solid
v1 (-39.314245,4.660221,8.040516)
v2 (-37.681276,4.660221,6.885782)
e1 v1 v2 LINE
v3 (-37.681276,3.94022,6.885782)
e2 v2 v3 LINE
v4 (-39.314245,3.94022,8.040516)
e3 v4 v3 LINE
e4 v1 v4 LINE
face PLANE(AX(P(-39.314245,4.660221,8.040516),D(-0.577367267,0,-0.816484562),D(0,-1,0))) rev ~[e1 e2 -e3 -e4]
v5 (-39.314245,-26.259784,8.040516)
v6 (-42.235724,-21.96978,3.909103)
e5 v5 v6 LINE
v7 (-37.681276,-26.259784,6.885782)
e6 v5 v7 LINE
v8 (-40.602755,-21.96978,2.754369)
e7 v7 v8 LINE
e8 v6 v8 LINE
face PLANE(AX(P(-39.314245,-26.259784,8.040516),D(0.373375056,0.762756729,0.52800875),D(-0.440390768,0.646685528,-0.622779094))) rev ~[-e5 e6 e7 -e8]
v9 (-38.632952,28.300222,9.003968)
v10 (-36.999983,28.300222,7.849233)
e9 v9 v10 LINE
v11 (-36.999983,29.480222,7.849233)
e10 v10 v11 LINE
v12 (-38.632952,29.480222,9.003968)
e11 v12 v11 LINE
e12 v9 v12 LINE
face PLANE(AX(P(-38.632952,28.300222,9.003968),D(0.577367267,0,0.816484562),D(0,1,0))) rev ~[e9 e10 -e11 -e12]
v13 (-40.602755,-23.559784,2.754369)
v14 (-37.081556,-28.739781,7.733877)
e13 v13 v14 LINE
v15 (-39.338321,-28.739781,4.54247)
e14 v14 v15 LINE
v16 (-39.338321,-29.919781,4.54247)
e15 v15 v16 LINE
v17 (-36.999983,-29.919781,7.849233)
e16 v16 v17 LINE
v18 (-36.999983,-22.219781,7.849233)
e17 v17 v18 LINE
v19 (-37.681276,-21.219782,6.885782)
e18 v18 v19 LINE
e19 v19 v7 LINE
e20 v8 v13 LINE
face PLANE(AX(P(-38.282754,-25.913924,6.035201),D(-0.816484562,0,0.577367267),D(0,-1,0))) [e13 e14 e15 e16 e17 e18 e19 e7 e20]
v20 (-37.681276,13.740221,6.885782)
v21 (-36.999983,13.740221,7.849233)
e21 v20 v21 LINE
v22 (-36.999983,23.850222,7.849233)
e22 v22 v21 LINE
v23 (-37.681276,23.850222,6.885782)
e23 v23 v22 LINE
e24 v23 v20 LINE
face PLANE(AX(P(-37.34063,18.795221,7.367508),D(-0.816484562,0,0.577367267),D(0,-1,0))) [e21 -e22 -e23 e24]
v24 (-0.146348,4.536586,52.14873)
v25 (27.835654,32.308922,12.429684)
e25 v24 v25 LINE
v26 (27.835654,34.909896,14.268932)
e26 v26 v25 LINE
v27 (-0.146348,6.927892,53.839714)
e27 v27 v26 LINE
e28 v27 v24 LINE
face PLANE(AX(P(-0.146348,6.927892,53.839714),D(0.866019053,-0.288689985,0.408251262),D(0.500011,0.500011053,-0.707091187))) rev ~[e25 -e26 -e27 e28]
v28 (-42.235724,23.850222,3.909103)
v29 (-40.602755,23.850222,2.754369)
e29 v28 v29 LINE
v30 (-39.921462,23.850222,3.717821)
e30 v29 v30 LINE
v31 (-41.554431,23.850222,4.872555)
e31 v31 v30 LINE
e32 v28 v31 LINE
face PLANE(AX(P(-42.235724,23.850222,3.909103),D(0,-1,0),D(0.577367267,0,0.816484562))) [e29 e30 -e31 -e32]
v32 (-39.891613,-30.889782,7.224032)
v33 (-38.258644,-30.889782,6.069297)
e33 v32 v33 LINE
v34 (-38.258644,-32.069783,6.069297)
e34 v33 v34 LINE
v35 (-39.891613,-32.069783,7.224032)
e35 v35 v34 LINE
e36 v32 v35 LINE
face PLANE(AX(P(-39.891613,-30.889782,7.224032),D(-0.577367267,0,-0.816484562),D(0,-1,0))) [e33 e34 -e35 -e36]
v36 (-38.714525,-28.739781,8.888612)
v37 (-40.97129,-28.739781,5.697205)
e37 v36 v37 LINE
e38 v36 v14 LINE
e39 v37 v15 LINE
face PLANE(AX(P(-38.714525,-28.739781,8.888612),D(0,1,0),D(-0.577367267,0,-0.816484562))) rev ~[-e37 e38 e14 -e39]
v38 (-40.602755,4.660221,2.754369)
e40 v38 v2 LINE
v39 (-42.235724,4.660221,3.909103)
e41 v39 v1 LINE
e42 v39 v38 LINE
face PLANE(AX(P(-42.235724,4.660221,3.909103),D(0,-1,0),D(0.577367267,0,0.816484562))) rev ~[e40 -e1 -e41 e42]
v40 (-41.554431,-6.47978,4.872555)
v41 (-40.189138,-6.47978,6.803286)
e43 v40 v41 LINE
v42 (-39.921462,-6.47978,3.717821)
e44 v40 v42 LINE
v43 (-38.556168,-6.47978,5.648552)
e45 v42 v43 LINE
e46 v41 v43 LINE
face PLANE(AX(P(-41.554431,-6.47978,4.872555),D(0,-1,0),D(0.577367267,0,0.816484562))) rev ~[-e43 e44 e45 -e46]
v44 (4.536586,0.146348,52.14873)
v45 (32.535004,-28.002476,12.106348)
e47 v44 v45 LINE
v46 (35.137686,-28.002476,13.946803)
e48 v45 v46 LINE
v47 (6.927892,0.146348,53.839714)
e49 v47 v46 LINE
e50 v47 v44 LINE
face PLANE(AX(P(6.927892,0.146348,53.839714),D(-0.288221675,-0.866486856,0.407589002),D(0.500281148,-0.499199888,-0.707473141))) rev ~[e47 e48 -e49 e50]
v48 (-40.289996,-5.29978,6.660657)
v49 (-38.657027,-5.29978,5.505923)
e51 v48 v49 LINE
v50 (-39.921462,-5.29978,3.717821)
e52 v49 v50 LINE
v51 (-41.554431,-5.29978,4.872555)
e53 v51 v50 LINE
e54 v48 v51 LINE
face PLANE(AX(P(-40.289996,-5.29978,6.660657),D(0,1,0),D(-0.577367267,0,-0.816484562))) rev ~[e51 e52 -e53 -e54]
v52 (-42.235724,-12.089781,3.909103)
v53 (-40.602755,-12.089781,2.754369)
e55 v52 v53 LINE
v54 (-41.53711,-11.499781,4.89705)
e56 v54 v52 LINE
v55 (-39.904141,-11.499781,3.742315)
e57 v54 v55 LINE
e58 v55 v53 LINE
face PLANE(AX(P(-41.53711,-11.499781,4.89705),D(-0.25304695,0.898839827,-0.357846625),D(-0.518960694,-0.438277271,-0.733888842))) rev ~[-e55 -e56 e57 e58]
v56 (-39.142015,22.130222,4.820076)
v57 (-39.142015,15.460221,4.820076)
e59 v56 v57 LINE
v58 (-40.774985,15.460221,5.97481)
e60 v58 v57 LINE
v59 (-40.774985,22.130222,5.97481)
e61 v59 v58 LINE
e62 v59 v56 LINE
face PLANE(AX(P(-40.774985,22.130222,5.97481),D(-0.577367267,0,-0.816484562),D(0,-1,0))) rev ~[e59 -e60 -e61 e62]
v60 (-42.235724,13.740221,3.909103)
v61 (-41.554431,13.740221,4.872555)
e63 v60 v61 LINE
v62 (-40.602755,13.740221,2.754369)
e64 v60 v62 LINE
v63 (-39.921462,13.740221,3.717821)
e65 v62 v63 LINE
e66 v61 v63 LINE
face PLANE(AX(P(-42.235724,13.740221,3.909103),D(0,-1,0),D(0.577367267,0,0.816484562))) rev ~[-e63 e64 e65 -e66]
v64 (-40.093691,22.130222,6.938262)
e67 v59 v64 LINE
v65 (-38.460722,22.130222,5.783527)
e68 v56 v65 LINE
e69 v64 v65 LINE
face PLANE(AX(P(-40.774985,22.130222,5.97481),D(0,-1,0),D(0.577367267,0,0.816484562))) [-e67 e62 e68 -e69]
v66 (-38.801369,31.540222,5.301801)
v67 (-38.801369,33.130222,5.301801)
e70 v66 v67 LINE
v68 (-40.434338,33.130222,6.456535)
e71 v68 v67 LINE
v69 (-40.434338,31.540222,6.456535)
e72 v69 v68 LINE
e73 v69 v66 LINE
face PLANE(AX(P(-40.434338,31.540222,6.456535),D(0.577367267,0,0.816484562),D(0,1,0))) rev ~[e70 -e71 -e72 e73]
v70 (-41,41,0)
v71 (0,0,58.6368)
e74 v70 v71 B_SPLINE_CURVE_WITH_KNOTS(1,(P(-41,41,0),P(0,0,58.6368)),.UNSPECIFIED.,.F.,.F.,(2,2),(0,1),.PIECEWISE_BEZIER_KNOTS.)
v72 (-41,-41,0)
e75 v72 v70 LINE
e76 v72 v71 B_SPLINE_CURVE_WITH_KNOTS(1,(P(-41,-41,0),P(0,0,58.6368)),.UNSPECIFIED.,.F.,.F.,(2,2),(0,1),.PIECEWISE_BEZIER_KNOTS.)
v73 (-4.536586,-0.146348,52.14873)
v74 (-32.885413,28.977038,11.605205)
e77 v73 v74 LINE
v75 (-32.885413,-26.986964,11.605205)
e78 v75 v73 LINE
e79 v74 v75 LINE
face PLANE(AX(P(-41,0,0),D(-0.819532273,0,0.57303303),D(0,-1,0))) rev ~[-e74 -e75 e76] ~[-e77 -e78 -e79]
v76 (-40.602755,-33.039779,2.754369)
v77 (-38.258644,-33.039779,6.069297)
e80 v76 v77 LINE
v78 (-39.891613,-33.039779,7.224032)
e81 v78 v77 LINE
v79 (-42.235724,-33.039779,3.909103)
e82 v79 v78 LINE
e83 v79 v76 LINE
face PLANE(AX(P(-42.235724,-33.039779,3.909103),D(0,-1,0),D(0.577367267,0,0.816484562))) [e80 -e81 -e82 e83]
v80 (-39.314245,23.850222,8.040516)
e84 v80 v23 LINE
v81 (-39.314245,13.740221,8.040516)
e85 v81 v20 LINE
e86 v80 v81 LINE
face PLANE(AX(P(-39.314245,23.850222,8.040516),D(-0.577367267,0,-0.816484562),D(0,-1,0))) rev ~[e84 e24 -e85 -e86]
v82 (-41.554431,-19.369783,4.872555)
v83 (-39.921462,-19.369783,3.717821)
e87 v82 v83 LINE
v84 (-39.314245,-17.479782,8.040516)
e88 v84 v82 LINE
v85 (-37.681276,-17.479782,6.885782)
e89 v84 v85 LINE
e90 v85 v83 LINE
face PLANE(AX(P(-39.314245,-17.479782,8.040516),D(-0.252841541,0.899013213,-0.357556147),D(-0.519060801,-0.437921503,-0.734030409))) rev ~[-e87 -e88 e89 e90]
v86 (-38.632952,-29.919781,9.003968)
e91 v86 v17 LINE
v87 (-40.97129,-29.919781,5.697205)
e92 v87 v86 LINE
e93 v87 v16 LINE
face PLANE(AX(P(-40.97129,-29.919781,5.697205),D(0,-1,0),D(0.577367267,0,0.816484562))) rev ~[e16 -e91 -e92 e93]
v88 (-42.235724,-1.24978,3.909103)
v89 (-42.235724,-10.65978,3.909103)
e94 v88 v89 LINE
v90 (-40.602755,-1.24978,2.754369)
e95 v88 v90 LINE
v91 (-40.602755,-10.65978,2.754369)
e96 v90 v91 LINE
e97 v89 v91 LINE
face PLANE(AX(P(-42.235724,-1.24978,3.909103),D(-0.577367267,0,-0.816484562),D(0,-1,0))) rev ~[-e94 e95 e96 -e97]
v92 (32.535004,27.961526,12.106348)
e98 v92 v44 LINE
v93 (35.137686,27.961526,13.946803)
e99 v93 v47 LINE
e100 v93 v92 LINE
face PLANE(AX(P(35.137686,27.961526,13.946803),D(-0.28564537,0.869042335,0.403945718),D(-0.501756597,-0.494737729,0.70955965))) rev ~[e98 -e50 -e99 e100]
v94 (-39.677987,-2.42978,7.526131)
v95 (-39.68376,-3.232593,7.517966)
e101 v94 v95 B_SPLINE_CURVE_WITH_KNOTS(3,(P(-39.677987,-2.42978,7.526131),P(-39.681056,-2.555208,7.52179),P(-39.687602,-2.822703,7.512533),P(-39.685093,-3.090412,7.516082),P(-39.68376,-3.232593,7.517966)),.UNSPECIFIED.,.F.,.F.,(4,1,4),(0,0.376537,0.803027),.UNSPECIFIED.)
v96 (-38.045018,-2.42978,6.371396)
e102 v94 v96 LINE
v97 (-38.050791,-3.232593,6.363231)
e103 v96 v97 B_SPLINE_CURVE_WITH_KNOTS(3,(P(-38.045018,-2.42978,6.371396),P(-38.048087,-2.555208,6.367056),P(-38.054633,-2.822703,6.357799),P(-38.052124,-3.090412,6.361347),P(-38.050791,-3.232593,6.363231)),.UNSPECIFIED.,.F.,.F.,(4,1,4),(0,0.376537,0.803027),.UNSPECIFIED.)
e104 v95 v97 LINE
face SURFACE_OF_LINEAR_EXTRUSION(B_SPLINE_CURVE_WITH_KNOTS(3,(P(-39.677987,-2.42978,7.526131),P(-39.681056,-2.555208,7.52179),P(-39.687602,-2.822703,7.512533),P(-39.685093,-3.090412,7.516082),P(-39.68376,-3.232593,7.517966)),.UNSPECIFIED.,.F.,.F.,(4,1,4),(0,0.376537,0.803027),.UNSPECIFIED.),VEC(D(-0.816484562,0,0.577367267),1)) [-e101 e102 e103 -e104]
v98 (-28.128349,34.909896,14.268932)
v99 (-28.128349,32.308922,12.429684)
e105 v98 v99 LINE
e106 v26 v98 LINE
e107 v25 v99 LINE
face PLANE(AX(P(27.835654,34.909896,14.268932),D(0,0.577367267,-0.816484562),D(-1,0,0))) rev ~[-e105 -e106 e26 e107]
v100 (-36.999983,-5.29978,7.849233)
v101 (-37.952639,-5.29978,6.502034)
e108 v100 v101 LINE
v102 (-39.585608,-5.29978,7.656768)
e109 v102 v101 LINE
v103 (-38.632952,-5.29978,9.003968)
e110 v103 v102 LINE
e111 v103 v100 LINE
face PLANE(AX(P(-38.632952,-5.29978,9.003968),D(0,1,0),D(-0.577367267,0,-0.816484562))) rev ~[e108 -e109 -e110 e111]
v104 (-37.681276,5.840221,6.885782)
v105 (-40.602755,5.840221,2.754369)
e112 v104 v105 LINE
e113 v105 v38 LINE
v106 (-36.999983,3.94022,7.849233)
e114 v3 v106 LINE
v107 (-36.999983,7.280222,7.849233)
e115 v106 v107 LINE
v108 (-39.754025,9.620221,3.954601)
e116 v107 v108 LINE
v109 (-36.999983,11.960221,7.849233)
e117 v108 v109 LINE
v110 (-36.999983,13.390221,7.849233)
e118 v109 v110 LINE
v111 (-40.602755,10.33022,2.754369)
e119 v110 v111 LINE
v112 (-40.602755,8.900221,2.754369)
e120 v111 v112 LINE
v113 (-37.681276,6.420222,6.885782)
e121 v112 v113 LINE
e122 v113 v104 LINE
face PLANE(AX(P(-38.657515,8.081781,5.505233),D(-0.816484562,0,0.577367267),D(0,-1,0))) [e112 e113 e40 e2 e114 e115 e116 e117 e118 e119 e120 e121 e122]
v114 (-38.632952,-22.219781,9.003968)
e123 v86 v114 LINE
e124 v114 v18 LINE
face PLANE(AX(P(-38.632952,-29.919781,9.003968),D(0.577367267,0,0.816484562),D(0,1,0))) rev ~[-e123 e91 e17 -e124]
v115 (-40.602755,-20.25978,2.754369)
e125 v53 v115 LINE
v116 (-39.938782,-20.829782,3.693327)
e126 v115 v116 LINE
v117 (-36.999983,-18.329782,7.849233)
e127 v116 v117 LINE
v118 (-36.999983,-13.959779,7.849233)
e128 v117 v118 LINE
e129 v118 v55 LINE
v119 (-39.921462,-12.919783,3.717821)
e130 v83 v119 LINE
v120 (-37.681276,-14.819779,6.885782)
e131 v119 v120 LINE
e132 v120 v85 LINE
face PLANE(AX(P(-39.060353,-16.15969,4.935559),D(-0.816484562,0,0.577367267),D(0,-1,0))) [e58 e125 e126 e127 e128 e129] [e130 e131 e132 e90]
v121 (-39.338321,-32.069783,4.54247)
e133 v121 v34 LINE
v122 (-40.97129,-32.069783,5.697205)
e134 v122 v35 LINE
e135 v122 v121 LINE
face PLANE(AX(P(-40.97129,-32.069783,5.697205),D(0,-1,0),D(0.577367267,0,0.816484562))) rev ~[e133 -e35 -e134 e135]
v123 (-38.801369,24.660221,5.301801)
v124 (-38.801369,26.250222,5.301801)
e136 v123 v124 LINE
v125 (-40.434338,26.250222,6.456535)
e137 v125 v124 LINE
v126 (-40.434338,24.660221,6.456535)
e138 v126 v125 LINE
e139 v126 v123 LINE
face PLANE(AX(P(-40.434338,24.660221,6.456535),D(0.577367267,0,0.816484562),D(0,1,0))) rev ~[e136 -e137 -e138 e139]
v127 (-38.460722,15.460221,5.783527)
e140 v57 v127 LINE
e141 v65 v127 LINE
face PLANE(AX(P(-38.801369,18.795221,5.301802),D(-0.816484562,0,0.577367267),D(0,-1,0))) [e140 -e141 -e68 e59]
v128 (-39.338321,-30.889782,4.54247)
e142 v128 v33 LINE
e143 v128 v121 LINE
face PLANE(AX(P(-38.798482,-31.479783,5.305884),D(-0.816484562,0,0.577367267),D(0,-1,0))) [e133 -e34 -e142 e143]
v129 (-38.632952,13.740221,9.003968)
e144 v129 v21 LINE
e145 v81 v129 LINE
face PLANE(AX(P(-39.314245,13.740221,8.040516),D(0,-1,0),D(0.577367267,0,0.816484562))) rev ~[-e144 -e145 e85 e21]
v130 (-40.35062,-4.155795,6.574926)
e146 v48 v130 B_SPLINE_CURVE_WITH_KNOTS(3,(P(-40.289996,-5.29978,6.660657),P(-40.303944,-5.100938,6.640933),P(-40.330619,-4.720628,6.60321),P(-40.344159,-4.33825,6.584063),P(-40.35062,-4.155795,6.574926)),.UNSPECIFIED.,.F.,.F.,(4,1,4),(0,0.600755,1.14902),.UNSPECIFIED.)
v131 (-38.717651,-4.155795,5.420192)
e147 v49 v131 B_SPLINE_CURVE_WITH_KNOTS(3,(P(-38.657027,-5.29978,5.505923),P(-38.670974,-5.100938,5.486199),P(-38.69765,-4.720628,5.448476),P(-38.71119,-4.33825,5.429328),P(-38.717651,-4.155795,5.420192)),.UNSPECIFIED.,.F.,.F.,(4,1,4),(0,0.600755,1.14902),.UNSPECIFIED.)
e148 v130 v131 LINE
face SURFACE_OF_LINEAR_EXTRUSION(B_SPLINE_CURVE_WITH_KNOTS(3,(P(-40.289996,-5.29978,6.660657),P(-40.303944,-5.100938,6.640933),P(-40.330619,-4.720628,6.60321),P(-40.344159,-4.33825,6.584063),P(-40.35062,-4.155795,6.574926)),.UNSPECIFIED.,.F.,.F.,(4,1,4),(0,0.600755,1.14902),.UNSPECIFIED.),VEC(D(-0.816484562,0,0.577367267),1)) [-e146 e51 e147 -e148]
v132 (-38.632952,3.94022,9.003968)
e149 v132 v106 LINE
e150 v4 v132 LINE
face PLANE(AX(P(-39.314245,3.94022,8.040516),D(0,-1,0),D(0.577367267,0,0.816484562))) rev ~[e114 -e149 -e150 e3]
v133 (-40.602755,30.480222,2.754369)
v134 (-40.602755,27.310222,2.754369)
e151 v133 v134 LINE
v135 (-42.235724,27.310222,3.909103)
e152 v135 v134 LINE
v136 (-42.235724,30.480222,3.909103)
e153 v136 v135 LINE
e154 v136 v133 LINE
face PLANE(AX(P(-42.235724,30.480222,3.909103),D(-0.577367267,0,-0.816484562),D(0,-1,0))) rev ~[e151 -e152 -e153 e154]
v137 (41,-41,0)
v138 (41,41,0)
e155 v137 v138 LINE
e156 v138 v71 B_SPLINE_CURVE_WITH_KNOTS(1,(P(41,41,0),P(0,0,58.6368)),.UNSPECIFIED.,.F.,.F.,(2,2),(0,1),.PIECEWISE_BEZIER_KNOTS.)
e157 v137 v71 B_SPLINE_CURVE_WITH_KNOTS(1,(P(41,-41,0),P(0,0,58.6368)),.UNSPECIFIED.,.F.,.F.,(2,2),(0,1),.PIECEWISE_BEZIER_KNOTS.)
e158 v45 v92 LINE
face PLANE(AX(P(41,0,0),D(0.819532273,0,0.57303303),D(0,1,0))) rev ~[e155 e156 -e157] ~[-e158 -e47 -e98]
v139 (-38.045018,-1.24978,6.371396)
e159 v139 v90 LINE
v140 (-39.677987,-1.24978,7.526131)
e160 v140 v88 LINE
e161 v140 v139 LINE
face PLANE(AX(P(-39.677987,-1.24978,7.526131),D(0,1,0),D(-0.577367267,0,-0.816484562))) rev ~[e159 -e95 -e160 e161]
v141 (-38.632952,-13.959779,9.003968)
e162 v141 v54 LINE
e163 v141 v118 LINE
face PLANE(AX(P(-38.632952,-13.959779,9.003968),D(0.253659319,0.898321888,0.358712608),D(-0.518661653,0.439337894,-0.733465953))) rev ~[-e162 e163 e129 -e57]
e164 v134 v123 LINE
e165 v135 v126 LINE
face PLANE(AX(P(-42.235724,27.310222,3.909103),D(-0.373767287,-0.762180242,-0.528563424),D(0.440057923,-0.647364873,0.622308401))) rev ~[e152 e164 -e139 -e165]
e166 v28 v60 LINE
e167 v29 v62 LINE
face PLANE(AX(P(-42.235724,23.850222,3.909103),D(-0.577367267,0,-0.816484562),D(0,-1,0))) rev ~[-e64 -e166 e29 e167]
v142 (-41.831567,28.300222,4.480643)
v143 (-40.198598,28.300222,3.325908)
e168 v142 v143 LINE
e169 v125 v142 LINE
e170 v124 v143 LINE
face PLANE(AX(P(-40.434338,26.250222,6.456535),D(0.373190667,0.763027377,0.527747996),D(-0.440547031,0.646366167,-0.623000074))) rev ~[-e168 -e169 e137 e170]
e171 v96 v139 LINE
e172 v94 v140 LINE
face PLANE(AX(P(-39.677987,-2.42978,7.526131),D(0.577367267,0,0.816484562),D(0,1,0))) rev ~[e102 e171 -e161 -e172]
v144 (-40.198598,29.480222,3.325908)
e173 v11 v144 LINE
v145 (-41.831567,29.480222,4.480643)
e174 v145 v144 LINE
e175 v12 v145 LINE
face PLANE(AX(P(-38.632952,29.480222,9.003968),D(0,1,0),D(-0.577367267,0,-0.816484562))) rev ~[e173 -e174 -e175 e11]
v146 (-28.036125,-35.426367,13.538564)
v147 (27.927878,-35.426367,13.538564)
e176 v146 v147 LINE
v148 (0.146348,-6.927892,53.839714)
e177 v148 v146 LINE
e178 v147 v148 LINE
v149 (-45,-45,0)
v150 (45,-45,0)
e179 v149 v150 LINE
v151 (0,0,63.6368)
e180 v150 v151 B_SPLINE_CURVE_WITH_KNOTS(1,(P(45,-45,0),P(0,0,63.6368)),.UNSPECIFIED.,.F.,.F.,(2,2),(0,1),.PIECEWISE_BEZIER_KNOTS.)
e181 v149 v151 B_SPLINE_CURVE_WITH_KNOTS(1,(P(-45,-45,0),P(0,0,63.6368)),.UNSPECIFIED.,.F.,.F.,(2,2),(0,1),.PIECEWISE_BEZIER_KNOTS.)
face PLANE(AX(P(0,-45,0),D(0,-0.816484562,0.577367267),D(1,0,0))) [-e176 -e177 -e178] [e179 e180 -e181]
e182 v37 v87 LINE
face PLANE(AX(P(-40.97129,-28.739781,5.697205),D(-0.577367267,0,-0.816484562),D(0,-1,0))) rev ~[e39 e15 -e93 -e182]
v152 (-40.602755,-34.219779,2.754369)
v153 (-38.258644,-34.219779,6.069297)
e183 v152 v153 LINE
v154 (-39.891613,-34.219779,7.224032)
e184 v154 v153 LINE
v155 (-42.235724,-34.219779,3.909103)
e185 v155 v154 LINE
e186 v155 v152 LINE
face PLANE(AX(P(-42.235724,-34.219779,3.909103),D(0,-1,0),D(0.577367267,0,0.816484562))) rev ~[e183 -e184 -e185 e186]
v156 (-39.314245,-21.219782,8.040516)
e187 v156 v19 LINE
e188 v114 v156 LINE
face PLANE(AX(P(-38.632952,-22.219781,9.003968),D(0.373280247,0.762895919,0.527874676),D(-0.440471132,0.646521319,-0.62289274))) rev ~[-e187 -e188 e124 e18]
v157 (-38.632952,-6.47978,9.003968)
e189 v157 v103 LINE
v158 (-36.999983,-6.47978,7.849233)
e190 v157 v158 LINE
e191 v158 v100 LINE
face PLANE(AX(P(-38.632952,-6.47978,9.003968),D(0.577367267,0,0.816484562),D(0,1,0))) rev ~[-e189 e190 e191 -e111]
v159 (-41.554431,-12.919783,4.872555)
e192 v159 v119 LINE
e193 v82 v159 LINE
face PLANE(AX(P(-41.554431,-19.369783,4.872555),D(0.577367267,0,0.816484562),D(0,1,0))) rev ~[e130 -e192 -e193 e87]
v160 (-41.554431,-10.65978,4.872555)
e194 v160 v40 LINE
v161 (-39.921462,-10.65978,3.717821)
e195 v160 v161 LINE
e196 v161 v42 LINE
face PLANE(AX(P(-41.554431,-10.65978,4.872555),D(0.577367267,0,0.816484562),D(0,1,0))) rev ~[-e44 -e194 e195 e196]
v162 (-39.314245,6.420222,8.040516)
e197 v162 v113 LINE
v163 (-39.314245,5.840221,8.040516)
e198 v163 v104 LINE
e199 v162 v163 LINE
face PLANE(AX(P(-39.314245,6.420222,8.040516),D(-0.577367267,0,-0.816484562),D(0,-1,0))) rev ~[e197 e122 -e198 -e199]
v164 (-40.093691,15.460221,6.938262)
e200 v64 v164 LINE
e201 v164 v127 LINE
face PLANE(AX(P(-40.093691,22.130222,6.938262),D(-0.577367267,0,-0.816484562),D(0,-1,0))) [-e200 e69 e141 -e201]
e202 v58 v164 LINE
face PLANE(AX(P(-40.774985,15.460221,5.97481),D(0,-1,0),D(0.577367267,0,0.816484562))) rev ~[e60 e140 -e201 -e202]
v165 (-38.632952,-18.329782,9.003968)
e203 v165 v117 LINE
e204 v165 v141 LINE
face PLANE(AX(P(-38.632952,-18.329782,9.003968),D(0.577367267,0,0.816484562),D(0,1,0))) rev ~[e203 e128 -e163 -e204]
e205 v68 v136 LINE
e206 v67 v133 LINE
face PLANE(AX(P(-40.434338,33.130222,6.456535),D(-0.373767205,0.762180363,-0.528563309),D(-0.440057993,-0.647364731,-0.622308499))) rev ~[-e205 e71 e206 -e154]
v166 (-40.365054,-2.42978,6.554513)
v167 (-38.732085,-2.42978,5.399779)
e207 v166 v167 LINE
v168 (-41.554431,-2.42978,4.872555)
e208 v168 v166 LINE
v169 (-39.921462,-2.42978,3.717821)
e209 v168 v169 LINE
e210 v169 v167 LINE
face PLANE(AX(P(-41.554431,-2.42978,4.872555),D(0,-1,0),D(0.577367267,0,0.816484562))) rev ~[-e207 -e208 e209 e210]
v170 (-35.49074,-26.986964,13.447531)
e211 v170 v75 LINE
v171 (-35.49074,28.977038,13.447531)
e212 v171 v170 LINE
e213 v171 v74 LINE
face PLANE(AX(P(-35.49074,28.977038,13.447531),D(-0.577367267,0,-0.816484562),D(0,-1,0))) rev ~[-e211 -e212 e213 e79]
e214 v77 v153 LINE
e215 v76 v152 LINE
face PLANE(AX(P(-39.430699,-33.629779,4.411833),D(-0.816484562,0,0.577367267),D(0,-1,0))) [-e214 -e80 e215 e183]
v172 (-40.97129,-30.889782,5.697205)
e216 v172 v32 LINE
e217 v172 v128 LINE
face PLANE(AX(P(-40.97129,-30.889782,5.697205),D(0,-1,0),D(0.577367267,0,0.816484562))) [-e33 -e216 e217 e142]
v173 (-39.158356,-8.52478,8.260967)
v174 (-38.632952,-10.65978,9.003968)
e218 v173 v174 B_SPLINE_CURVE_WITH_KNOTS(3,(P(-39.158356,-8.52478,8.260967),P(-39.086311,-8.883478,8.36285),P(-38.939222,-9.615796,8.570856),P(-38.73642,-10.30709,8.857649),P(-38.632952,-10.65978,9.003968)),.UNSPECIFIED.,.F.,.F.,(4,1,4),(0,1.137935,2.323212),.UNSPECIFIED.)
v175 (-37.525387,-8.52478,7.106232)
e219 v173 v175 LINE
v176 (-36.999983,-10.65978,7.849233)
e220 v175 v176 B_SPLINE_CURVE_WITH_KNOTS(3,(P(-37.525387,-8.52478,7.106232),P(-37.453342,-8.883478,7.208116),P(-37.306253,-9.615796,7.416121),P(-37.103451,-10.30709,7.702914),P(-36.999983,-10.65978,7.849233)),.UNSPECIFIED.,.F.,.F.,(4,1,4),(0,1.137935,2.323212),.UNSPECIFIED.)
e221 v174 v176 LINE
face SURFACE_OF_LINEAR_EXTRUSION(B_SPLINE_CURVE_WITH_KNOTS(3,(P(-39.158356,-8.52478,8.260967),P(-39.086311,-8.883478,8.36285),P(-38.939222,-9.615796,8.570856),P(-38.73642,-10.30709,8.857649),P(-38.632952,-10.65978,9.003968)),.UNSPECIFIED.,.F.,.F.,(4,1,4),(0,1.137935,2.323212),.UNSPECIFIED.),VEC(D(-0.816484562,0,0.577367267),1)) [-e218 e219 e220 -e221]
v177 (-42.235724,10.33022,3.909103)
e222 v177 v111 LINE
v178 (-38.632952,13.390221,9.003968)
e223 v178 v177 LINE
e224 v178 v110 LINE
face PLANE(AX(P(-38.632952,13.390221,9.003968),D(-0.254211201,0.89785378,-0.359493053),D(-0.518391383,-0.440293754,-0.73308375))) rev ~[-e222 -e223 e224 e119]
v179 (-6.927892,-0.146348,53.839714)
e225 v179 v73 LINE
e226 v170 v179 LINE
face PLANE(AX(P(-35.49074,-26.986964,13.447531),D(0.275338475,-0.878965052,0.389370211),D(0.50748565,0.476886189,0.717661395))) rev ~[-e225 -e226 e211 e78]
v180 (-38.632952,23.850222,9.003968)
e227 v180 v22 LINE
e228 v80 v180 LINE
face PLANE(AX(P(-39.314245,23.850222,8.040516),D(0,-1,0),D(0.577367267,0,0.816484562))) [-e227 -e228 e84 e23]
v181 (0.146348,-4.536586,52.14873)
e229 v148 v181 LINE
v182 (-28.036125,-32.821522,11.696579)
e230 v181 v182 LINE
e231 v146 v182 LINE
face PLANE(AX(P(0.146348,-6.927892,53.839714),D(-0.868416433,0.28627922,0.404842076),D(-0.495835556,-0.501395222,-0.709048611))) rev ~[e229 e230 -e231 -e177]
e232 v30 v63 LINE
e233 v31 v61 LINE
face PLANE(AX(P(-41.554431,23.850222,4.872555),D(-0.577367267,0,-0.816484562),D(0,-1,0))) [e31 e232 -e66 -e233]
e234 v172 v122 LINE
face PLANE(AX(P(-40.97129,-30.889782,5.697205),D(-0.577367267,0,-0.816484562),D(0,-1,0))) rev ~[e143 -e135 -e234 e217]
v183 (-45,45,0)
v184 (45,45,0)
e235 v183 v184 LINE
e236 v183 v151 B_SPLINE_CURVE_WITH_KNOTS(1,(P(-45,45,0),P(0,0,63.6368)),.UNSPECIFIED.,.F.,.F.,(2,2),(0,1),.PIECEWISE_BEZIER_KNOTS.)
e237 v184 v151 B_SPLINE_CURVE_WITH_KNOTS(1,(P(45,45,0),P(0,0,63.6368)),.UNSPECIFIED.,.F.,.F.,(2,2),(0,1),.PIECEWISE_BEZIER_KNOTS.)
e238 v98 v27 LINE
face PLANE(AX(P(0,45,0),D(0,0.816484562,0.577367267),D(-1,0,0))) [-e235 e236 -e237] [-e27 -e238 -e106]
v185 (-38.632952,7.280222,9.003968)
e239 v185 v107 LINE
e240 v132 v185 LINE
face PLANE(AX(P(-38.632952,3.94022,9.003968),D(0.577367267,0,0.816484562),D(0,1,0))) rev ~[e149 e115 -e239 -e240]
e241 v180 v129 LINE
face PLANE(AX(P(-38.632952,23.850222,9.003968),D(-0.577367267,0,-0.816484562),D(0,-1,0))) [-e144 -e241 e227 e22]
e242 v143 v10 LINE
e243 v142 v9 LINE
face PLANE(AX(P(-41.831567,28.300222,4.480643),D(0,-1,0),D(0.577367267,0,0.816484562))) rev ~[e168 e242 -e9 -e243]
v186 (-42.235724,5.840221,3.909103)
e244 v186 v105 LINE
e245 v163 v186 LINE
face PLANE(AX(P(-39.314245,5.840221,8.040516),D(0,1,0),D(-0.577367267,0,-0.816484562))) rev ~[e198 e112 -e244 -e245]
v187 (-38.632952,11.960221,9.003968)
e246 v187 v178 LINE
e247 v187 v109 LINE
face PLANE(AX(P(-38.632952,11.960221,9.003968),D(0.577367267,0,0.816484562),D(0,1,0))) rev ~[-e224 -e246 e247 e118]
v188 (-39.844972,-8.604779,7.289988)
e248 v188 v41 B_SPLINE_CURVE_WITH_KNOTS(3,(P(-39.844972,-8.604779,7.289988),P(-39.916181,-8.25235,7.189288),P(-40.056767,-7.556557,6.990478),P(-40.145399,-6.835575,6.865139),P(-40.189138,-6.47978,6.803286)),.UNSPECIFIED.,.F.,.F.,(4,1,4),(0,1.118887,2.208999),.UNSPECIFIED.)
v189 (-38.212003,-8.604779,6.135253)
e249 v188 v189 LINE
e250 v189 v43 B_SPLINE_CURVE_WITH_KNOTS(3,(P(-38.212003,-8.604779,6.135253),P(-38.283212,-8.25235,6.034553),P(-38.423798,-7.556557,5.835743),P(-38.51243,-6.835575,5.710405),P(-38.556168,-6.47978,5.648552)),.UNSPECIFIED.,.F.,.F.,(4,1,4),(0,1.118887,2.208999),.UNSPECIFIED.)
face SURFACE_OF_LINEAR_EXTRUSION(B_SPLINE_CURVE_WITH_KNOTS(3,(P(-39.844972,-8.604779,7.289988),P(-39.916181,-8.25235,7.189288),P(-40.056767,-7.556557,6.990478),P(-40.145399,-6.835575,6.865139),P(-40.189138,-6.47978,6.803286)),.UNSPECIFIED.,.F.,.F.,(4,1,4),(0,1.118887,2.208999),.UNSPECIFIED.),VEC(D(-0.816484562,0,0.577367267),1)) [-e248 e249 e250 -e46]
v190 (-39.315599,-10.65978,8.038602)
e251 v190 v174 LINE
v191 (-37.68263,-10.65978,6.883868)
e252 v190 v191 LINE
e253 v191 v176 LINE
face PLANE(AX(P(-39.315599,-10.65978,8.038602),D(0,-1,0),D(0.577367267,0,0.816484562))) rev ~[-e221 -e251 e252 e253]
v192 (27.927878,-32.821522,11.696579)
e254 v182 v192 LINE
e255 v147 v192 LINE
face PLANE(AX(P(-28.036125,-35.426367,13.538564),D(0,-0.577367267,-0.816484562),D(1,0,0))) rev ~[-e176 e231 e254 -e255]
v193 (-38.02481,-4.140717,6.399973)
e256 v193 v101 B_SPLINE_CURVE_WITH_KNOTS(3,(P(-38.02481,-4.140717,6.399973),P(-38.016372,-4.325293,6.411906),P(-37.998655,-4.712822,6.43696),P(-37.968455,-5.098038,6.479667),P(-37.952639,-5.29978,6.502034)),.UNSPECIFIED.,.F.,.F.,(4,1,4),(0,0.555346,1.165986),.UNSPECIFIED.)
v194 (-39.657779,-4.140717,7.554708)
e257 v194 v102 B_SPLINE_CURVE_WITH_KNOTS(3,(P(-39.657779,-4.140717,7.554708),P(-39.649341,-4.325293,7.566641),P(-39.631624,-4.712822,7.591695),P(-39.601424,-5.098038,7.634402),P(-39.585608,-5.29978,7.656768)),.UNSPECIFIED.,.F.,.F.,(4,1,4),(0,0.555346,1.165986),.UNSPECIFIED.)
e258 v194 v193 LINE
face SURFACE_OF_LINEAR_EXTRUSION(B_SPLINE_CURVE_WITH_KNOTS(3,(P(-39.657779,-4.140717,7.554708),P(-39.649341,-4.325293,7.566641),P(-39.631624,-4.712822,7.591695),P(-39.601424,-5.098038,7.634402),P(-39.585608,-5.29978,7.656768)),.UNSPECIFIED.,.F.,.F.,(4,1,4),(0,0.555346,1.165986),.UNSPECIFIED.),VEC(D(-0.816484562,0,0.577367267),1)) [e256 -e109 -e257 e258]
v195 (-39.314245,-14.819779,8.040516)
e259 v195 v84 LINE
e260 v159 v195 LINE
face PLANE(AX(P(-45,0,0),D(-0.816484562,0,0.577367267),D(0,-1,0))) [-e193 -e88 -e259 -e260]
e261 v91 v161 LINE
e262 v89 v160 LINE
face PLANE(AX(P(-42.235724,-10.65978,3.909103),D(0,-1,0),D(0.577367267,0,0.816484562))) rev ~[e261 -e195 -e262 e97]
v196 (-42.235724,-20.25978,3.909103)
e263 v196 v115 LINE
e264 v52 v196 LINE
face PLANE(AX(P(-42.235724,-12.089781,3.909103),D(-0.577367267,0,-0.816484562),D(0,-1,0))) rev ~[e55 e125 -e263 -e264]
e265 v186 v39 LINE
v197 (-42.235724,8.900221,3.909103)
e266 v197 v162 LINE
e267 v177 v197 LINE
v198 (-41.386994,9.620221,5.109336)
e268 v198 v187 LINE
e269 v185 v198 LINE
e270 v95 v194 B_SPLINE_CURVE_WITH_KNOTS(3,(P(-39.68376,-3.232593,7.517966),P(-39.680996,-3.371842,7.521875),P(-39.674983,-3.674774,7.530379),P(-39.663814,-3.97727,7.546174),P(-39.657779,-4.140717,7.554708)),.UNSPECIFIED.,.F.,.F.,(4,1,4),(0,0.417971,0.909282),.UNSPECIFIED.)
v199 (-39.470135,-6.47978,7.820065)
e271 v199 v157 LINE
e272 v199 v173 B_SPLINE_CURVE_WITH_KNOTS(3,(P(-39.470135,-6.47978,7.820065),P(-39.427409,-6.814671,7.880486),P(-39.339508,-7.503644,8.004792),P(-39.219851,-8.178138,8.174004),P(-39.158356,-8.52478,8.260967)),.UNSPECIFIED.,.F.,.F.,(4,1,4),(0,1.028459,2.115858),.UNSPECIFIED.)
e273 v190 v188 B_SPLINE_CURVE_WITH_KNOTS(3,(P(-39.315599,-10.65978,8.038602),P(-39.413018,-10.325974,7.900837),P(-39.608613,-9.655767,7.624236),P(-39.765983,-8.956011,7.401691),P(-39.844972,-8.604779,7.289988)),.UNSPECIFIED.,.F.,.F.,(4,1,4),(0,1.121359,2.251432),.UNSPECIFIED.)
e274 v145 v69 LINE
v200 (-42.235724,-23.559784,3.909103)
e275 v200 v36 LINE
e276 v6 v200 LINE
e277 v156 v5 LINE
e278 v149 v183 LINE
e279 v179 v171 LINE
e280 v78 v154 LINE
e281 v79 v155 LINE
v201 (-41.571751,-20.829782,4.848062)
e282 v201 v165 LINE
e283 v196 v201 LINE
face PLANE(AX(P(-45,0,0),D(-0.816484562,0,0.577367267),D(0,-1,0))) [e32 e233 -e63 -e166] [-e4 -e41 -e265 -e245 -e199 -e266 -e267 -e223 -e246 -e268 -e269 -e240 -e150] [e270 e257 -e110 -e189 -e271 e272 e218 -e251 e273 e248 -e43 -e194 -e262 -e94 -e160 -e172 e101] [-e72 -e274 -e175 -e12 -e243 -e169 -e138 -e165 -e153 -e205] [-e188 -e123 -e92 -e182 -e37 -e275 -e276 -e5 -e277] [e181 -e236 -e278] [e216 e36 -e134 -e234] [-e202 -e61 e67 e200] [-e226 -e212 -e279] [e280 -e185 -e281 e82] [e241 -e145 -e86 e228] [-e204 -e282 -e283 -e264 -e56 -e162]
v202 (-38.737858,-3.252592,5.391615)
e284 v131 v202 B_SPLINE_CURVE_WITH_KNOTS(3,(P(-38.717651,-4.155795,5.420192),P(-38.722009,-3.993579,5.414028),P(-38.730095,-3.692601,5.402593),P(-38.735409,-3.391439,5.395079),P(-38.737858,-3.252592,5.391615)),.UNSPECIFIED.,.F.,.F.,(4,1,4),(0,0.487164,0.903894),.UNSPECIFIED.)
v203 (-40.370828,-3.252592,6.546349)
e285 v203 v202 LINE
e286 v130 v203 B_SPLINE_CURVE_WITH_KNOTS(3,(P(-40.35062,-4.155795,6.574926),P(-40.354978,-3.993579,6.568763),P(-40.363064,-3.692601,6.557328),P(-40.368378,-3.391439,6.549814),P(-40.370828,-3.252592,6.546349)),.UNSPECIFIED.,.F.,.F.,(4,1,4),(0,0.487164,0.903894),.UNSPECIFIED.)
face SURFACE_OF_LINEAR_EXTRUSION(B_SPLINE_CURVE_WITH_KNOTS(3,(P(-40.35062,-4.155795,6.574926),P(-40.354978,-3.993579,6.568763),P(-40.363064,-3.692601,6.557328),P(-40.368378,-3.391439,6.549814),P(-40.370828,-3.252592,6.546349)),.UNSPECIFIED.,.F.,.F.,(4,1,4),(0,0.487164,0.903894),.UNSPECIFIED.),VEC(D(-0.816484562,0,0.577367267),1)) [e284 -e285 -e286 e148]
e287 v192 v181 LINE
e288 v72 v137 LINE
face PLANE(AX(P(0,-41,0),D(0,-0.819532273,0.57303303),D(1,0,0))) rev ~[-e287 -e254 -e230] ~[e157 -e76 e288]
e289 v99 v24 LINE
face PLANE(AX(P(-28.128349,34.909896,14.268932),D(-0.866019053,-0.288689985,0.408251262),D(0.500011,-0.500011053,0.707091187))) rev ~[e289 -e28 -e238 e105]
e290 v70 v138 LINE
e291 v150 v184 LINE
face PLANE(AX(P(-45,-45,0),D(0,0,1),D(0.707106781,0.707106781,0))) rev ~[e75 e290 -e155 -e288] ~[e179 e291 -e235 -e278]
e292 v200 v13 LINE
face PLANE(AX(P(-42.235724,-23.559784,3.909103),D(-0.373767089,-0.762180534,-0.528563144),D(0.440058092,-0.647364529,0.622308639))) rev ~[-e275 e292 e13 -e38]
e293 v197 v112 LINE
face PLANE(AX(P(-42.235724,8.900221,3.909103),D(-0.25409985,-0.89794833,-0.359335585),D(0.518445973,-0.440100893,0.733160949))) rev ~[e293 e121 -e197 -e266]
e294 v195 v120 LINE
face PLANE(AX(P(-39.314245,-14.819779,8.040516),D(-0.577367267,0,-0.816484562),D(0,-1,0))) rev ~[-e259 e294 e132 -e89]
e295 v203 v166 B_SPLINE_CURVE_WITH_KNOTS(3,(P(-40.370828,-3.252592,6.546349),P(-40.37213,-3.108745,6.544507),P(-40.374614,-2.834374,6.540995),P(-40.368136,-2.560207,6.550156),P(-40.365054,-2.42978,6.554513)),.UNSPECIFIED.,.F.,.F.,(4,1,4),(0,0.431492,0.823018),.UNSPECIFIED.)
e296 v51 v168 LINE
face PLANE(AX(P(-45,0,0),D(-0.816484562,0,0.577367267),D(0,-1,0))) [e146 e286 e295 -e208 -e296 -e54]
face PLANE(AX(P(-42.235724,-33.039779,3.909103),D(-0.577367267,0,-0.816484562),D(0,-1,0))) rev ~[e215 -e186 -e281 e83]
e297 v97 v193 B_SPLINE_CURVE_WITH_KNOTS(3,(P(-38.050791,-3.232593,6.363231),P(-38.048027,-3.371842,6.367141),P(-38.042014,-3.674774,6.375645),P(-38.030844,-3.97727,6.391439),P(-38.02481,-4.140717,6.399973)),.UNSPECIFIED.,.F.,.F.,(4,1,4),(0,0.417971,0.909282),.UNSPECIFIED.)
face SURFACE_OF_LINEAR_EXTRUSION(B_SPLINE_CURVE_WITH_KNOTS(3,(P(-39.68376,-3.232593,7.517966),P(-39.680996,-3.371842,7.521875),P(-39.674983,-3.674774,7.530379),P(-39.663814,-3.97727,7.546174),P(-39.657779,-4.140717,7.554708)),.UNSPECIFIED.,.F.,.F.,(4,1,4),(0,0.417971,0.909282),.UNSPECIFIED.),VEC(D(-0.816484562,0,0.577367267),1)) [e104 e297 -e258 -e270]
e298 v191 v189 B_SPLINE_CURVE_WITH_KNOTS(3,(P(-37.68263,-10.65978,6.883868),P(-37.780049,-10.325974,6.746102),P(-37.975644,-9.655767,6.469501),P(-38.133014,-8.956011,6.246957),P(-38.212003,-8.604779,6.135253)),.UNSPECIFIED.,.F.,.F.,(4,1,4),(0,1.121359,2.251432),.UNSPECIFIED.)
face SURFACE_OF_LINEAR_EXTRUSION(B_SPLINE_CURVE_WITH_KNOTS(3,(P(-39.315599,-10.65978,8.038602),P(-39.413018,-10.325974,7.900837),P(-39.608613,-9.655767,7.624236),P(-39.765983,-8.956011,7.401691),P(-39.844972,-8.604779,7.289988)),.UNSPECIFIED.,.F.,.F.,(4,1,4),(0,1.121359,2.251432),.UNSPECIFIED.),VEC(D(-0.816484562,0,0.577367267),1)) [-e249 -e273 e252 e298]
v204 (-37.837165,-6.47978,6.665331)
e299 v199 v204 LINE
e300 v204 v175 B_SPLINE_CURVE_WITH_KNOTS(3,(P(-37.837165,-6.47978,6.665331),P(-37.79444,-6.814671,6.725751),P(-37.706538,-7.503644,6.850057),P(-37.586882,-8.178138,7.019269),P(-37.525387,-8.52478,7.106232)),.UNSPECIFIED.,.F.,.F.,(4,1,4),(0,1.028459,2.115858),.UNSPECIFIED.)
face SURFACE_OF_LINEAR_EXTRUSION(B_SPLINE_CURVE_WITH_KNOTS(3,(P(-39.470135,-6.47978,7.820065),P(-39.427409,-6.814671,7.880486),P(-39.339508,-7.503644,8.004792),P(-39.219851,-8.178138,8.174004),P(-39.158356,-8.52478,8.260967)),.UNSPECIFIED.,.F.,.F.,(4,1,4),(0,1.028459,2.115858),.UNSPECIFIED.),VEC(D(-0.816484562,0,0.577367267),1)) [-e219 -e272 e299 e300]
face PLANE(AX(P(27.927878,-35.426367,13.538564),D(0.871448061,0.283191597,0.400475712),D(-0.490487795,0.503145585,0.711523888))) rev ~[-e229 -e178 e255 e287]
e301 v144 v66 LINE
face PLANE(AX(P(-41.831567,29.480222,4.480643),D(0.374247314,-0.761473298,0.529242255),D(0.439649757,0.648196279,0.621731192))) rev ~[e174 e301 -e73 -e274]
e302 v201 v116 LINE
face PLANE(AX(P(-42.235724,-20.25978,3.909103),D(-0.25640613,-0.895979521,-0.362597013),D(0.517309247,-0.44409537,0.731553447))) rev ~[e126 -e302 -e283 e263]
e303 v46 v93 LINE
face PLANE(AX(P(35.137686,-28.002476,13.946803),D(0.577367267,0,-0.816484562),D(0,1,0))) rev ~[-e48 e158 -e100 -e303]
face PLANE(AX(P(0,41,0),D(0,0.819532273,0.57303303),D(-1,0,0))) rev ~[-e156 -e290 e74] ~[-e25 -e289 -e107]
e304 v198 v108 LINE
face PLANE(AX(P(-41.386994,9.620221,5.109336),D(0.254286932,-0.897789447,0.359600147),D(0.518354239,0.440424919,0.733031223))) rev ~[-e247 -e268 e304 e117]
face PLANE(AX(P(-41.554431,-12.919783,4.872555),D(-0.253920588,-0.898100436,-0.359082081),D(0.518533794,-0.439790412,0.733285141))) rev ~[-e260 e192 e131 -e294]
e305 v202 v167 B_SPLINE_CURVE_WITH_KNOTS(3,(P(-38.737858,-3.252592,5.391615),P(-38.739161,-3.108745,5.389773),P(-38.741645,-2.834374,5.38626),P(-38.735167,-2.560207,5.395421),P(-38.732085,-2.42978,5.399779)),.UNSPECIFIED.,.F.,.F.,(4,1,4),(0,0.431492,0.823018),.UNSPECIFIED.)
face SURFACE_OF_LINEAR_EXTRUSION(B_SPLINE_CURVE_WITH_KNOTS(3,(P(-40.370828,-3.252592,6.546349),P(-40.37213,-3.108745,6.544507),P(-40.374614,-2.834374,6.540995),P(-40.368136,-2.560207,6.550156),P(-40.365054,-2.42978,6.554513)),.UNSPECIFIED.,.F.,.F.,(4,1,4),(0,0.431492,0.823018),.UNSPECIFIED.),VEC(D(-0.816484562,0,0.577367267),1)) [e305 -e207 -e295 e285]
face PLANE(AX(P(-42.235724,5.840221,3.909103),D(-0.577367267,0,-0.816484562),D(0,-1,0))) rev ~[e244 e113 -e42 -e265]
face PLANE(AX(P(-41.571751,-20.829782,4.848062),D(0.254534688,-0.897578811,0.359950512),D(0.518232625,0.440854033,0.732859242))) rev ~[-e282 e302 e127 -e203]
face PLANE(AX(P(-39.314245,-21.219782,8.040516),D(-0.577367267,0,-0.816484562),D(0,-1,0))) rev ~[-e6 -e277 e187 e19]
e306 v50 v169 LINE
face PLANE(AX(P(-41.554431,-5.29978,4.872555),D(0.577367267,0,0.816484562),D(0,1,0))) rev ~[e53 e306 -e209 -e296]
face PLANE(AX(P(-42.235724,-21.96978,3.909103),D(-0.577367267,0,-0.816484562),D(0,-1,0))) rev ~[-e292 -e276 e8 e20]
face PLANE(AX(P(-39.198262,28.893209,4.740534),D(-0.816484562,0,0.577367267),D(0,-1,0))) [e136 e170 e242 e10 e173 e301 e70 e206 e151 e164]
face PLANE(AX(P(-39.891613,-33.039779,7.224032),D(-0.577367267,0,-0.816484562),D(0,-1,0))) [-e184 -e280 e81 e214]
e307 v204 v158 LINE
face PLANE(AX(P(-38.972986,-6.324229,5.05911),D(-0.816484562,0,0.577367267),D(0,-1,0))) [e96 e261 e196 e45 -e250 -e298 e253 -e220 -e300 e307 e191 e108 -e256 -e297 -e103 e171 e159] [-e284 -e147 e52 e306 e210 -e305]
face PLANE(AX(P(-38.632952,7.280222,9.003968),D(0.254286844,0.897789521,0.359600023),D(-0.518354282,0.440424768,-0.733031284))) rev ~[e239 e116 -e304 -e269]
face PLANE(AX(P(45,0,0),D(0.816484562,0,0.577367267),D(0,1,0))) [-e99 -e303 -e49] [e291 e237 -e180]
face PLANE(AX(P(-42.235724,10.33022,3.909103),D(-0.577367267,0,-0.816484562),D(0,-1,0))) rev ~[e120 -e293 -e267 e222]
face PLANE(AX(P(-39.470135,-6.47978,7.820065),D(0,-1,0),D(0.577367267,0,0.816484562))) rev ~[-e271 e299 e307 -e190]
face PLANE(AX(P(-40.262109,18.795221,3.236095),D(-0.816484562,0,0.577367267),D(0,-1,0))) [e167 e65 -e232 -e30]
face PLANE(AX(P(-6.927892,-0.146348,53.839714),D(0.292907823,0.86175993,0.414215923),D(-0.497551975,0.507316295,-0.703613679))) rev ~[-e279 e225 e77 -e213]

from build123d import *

# Parameters (mm, degrees)
F2_W      = 90
F2_H      = 90
F6_W      = 82
F6_H      = 82
F12_DEPTH = 5
F13_DEPTH = 10.1
F14_DEPTH = 10
F15_DEPTH = 10
F16_W     = 1.180001
F16_H     = 1.870001
F16_W_2   = 1.18
F16_H_2   = 4.060001
F16_W_3   = 10.110001
F16_H_3   = 1.18
F16_W_4   = 6.670001
F17_DEPTH = 2


# Not quite as in the source:
# - the dataset's text gives a spline's control points without its knots; the knots are read off the source's solid


with BuildPart() as f3:
    # F2 (on Top) → F3 section 0
    with BuildSketch(Plane.XY, mode=Mode.PRIVATE) as f3_s0:
        Rectangle(F2_W, F2_H)
    loft([f3_s0.sketch, Vertex(0, 0, 63.6368)])

    # F6 (on face) → F7 section 0
    with BuildSketch(Plane.XY, mode=Mode.PRIVATE) as f7_s0:
        Rectangle(F6_W, F6_H)
    loft([f7_s0.sketch, Vertex(0, 0, 58.6368)], mode=Mode.SUBTRACT)

    # F8 (on face) → F12 (cut, symmetric)
    with BuildSketch(Plane(origin=(29.9991167733, 0, 21.2135156827), x_dir=(0, 1, 0), z_dir=(0.8164845616, 0, 0.5773672666))):
        Polygon((0.1463476627, 39.9593571873), (-28.0024763197, -8.9000007138), (27.9615262598, -8.9000007138), align=None)
    extrude(amount=F12_DEPTH, both=True, mode=Mode.SUBTRACT)

    # F9 (on face) → F13 (cut)
    with BuildSketch(Plane(origin=(0, 29.9991167733, 21.2135156827), x_dir=(-1, 0, 0), z_dir=(0, 0.8164845616, 0.5773672666))):
        Polygon((0.1463476627, 39.9593571873), (-27.835653627, -8.5054690465), (28.1283489525, -8.5054690465), align=None)
    extrude(amount=-F13_DEPTH, mode=Mode.SUBTRACT)

    # F10 (on face) → F14 (cut)
    with BuildSketch(Plane(origin=(-29.9991167733, 0, 21.2135156827), x_dir=(0, -1, 0), z_dir=(-0.8164845616, 0, 0.5773672666))):
        Polygon((0.1463476627, 39.9593571873), (-28.9770383388, -9.5114903525), (26.9869642407, -9.5114903525), align=None)
    extrude(amount=-F14_DEPTH, mode=Mode.SUBTRACT)

    # F11 (on face) → F15 (cut)
    with BuildSketch(Plane(origin=(0, -29.9991167733, 21.2135156827), x_dir=(1, 0, 0), z_dir=(0, -0.8164845616, 0.5773672666))):
        Polygon((0.1463476627, 39.9593571873), (-28.0361250043, -9.3999961391), (27.9278775752, -9.3999961391), align=None)
    extrude(amount=-F15_DEPTH, mode=Mode.SUBTRACT)

    # F16 (on face) → F17 (cut)
    with BuildSketch(Plane(origin=(-29.9991167733, 0, 21.2135156827), x_dir=(0, -1, 0), z_dir=(-0.8164845616, 0, 0.5773672666))):
        Polygon((21.9697801374, -21.1938021154), (23.5597841374, -21.1938021154), (28.7397811374, -15.0950853876), (28.7397811374, -19.0038021154), (29.9197811374, -19.0038021154), (29.9197811374, -14.9538011154), (28.8597821374, -14.9538011154), (28.7397811374, -14.9538011154), (22.2197811374, -14.9538011154), (21.2197821374, -16.1338011154), (26.2597841374, -16.1338011154), align=None)
        with Locations((31.4797826374, -18.0688016154)):
            Rectangle(F16_W, F16_H)
        with Locations((33.6297791374, -19.1638016154)):
            Rectangle(F16_W_2, F16_H_2)
        Polygon((12.0897811374, -21.1938021154), (20.2597801374, -21.1938021154), (20.8297821374, -20.0438011154), (18.3297821374, -14.9538011154), (13.9597791374, -14.9538011154), (11.4997811374, -19.9838021154), align=None)
        Polygon((19.3697831374, -20.0138021154), (12.9197831374, -20.0138021154), (14.8197791374, -16.1338011154), (17.4797821374, -16.1338011154), align=None, mode=Mode.SUBTRACT)
        with BuildLine():
            Line((5.2997801374, -14.9538011154), (5.2997801374, -16.6038011154))
            add(Edge.make_bspline(
                [(4.1407171374, -16.7288011154), (4.3252931374, -16.7141861154), (4.7128221374, -16.6835011154), (5.0980381374, -16.6311951154), (5.2997801374, -16.6038011154)],
                knots=[0, 0, 0, 0, 0.555346, 1.165986, 1.165986, 1.165986, 1.165986], degree=3))
            add(Edge.make_bspline(
                [(3.2325931374, -16.7738011154), (3.3718421374, -16.7690131154), (3.6747741374, -16.7585981154), (3.9772701374, -16.7392531154), (4.1407171374, -16.7288011154)],
                knots=[0, 0, 0, 0, 0.417971, 0.909282, 0.909282, 0.909282, 0.909282], degree=3))
            add(Edge.make_bspline(
                [(2.4297801374, -16.7638011154), (2.5552081374, -16.7691171154), (2.8227031374, -16.7804551154), (3.0904121374, -16.7761091154), (3.2325931374, -16.7738011154)],
                knots=[0, 0, 0, 0, 0.376537, 0.803027, 0.803027, 0.803027, 0.803027], degree=3))
            Line((2.4297801374, -16.7638011154), (1.2497801374, -16.7638011154))
            Line((1.2497801374, -16.7638011154), (1.2497801374, -21.1938021154))
            Line((1.2497801374, -21.1938021154), (10.6597801374, -21.1938021154))
            Line((10.6597801374, -21.1938021154), (10.6597801374, -20.0138021154))
            Line((10.6597801374, -20.0138021154), (6.4797801374, -20.0138021154))
            Line((6.4797801374, -20.0138021154), (6.4797801374, -17.6491141154))
            add(Edge.make_bspline(
                [(8.6047791374, -17.0530201154), (8.2523501374, -17.1763541154), (7.5565571374, -17.4198491154), (6.8355751374, -17.5733591154), (6.4797801374, -17.6491141154)],
                knots=[0, 0, 0, 0, 1.118887, 2.208999, 2.208999, 2.208999, 2.208999], degree=3))
            add(Edge.make_bspline(
                [(10.6597801374, -16.1361451154), (10.3259741374, -16.3048751154), (9.6557671374, -16.6436461154), (8.9560111374, -16.9162101154), (8.6047791374, -17.0530201154)],
                knots=[0, 0, 0, 0, 1.121359, 2.251432, 2.251432, 2.251432, 2.251432], degree=3))
            Line((10.6597801374, -16.1361451154), (10.6597801374, -14.9538011154))
            add(Edge.make_bspline(
                [(8.5247801374, -15.8638011154), (8.8834781374, -15.7390181154), (9.6157961374, -15.4842611154), (10.3070901374, -15.1330071154), (10.6597801374, -14.9538011154)],
                knots=[0, 0, 0, 0, 1.137935, 2.323212, 2.323212, 2.323212, 2.323212], degree=3))
            add(Edge.make_bspline(
                [(6.4797801374, -16.4038011154), (6.8146711374, -16.3298001154), (7.5036441374, -16.1775551154), (8.1781381374, -15.9703101154), (8.5247801374, -15.8638011154)],
                knots=[0, 0, 0, 0, 1.028459, 2.115858, 2.115858, 2.115858, 2.115858], degree=3))
            Line((6.4797801374, -16.4038011154), (6.4797801374, -14.9538011154))
            Line((6.4797801374, -14.9538011154), (5.2997801374, -14.9538011154))
        make_face()
        with BuildLine():
            Line((5.2997801374, -20.0138021154), (2.4297801374, -20.0138021154))
            Line((2.4297801374, -20.0138021154), (2.4297801374, -17.9538021154))
            add(Edge.make_bspline(
                [(3.2525921374, -17.9638011154), (3.1087451374, -17.9660571154), (2.8343741374, -17.9703591154), (2.5602071374, -17.9591391154), (2.4297801374, -17.9538021154)],
                knots=[0, 0, 0, 0, 0.431492, 0.823018, 0.823018, 0.823018, 0.823018], degree=3))
            add(Edge.make_bspline(
                [(4.1557951374, -17.9288011154), (3.9935791374, -17.9363501154), (3.6926011374, -17.9503551154), (3.3914391374, -17.9595581154), (3.2525921374, -17.9638011154)],
                knots=[0, 0, 0, 0, 0.487164, 0.903894, 0.903894, 0.903894, 0.903894], degree=3))
            add(Edge.make_bspline(
                [(5.2997801374, -17.8238011154), (5.1009381374, -17.8479581154), (4.7206281374, -17.8941601154), (4.3382501374, -17.9176111154), (4.1557951374, -17.9288011154)],
                knots=[0, 0, 0, 0, 0.600755, 1.14902, 1.14902, 1.14902, 1.14902], degree=3))
            Line((5.2997801374, -17.8238011154), (5.2997801374, -20.0138021154))
        make_face(mode=Mode.SUBTRACT)
        Polygon((-7.2802218626, -14.9538011154), (-9.6202208626, -19.7238021154), (-11.9602208626, -14.9538011154), (-13.3902208626, -14.9538011154), (-10.3302198626, -21.1938021154), (-8.9002208626, -21.1938021154), (-6.4202218626, -16.1338011154), (-5.8402208626, -16.1338011154), (-5.8402208626, -21.1938021154), (-4.6602208626, -21.1938021154), (-4.6602208626, -16.1338011154), (-3.9402198626, -16.1338011154), (-3.9402198626, -14.9538011154), align=None)
        with Locations((-18.7952213626, -15.5438011154)):
            Rectangle(F16_W_3, F16_H_3)
        with Locations((-18.7952213626, -18.0738011154)):
            Rectangle(F16_W_4, F16_H_3)
        with Locations((-18.7952213626, -20.6038021154)):
            Rectangle(F16_W_3, F16_H_3)
        Polygon((-33.1302218626, -18.0738021154), (-30.4802218626, -21.1938021154), (-27.3102218626, -21.1938021154), (-24.6602208626, -18.0738021154), (-26.2502218626, -18.0738021154), (-28.3002218626, -20.4938021154), (-28.3002218626, -14.9538011154), (-29.4802218626, -14.9538011154), (-29.4802218626, -20.4938021154), (-31.5402218626, -18.0738021154), align=None)
    extrude(amount=-F17_DEPTH, mode=Mode.SUBTRACT)


solid = f3.part
